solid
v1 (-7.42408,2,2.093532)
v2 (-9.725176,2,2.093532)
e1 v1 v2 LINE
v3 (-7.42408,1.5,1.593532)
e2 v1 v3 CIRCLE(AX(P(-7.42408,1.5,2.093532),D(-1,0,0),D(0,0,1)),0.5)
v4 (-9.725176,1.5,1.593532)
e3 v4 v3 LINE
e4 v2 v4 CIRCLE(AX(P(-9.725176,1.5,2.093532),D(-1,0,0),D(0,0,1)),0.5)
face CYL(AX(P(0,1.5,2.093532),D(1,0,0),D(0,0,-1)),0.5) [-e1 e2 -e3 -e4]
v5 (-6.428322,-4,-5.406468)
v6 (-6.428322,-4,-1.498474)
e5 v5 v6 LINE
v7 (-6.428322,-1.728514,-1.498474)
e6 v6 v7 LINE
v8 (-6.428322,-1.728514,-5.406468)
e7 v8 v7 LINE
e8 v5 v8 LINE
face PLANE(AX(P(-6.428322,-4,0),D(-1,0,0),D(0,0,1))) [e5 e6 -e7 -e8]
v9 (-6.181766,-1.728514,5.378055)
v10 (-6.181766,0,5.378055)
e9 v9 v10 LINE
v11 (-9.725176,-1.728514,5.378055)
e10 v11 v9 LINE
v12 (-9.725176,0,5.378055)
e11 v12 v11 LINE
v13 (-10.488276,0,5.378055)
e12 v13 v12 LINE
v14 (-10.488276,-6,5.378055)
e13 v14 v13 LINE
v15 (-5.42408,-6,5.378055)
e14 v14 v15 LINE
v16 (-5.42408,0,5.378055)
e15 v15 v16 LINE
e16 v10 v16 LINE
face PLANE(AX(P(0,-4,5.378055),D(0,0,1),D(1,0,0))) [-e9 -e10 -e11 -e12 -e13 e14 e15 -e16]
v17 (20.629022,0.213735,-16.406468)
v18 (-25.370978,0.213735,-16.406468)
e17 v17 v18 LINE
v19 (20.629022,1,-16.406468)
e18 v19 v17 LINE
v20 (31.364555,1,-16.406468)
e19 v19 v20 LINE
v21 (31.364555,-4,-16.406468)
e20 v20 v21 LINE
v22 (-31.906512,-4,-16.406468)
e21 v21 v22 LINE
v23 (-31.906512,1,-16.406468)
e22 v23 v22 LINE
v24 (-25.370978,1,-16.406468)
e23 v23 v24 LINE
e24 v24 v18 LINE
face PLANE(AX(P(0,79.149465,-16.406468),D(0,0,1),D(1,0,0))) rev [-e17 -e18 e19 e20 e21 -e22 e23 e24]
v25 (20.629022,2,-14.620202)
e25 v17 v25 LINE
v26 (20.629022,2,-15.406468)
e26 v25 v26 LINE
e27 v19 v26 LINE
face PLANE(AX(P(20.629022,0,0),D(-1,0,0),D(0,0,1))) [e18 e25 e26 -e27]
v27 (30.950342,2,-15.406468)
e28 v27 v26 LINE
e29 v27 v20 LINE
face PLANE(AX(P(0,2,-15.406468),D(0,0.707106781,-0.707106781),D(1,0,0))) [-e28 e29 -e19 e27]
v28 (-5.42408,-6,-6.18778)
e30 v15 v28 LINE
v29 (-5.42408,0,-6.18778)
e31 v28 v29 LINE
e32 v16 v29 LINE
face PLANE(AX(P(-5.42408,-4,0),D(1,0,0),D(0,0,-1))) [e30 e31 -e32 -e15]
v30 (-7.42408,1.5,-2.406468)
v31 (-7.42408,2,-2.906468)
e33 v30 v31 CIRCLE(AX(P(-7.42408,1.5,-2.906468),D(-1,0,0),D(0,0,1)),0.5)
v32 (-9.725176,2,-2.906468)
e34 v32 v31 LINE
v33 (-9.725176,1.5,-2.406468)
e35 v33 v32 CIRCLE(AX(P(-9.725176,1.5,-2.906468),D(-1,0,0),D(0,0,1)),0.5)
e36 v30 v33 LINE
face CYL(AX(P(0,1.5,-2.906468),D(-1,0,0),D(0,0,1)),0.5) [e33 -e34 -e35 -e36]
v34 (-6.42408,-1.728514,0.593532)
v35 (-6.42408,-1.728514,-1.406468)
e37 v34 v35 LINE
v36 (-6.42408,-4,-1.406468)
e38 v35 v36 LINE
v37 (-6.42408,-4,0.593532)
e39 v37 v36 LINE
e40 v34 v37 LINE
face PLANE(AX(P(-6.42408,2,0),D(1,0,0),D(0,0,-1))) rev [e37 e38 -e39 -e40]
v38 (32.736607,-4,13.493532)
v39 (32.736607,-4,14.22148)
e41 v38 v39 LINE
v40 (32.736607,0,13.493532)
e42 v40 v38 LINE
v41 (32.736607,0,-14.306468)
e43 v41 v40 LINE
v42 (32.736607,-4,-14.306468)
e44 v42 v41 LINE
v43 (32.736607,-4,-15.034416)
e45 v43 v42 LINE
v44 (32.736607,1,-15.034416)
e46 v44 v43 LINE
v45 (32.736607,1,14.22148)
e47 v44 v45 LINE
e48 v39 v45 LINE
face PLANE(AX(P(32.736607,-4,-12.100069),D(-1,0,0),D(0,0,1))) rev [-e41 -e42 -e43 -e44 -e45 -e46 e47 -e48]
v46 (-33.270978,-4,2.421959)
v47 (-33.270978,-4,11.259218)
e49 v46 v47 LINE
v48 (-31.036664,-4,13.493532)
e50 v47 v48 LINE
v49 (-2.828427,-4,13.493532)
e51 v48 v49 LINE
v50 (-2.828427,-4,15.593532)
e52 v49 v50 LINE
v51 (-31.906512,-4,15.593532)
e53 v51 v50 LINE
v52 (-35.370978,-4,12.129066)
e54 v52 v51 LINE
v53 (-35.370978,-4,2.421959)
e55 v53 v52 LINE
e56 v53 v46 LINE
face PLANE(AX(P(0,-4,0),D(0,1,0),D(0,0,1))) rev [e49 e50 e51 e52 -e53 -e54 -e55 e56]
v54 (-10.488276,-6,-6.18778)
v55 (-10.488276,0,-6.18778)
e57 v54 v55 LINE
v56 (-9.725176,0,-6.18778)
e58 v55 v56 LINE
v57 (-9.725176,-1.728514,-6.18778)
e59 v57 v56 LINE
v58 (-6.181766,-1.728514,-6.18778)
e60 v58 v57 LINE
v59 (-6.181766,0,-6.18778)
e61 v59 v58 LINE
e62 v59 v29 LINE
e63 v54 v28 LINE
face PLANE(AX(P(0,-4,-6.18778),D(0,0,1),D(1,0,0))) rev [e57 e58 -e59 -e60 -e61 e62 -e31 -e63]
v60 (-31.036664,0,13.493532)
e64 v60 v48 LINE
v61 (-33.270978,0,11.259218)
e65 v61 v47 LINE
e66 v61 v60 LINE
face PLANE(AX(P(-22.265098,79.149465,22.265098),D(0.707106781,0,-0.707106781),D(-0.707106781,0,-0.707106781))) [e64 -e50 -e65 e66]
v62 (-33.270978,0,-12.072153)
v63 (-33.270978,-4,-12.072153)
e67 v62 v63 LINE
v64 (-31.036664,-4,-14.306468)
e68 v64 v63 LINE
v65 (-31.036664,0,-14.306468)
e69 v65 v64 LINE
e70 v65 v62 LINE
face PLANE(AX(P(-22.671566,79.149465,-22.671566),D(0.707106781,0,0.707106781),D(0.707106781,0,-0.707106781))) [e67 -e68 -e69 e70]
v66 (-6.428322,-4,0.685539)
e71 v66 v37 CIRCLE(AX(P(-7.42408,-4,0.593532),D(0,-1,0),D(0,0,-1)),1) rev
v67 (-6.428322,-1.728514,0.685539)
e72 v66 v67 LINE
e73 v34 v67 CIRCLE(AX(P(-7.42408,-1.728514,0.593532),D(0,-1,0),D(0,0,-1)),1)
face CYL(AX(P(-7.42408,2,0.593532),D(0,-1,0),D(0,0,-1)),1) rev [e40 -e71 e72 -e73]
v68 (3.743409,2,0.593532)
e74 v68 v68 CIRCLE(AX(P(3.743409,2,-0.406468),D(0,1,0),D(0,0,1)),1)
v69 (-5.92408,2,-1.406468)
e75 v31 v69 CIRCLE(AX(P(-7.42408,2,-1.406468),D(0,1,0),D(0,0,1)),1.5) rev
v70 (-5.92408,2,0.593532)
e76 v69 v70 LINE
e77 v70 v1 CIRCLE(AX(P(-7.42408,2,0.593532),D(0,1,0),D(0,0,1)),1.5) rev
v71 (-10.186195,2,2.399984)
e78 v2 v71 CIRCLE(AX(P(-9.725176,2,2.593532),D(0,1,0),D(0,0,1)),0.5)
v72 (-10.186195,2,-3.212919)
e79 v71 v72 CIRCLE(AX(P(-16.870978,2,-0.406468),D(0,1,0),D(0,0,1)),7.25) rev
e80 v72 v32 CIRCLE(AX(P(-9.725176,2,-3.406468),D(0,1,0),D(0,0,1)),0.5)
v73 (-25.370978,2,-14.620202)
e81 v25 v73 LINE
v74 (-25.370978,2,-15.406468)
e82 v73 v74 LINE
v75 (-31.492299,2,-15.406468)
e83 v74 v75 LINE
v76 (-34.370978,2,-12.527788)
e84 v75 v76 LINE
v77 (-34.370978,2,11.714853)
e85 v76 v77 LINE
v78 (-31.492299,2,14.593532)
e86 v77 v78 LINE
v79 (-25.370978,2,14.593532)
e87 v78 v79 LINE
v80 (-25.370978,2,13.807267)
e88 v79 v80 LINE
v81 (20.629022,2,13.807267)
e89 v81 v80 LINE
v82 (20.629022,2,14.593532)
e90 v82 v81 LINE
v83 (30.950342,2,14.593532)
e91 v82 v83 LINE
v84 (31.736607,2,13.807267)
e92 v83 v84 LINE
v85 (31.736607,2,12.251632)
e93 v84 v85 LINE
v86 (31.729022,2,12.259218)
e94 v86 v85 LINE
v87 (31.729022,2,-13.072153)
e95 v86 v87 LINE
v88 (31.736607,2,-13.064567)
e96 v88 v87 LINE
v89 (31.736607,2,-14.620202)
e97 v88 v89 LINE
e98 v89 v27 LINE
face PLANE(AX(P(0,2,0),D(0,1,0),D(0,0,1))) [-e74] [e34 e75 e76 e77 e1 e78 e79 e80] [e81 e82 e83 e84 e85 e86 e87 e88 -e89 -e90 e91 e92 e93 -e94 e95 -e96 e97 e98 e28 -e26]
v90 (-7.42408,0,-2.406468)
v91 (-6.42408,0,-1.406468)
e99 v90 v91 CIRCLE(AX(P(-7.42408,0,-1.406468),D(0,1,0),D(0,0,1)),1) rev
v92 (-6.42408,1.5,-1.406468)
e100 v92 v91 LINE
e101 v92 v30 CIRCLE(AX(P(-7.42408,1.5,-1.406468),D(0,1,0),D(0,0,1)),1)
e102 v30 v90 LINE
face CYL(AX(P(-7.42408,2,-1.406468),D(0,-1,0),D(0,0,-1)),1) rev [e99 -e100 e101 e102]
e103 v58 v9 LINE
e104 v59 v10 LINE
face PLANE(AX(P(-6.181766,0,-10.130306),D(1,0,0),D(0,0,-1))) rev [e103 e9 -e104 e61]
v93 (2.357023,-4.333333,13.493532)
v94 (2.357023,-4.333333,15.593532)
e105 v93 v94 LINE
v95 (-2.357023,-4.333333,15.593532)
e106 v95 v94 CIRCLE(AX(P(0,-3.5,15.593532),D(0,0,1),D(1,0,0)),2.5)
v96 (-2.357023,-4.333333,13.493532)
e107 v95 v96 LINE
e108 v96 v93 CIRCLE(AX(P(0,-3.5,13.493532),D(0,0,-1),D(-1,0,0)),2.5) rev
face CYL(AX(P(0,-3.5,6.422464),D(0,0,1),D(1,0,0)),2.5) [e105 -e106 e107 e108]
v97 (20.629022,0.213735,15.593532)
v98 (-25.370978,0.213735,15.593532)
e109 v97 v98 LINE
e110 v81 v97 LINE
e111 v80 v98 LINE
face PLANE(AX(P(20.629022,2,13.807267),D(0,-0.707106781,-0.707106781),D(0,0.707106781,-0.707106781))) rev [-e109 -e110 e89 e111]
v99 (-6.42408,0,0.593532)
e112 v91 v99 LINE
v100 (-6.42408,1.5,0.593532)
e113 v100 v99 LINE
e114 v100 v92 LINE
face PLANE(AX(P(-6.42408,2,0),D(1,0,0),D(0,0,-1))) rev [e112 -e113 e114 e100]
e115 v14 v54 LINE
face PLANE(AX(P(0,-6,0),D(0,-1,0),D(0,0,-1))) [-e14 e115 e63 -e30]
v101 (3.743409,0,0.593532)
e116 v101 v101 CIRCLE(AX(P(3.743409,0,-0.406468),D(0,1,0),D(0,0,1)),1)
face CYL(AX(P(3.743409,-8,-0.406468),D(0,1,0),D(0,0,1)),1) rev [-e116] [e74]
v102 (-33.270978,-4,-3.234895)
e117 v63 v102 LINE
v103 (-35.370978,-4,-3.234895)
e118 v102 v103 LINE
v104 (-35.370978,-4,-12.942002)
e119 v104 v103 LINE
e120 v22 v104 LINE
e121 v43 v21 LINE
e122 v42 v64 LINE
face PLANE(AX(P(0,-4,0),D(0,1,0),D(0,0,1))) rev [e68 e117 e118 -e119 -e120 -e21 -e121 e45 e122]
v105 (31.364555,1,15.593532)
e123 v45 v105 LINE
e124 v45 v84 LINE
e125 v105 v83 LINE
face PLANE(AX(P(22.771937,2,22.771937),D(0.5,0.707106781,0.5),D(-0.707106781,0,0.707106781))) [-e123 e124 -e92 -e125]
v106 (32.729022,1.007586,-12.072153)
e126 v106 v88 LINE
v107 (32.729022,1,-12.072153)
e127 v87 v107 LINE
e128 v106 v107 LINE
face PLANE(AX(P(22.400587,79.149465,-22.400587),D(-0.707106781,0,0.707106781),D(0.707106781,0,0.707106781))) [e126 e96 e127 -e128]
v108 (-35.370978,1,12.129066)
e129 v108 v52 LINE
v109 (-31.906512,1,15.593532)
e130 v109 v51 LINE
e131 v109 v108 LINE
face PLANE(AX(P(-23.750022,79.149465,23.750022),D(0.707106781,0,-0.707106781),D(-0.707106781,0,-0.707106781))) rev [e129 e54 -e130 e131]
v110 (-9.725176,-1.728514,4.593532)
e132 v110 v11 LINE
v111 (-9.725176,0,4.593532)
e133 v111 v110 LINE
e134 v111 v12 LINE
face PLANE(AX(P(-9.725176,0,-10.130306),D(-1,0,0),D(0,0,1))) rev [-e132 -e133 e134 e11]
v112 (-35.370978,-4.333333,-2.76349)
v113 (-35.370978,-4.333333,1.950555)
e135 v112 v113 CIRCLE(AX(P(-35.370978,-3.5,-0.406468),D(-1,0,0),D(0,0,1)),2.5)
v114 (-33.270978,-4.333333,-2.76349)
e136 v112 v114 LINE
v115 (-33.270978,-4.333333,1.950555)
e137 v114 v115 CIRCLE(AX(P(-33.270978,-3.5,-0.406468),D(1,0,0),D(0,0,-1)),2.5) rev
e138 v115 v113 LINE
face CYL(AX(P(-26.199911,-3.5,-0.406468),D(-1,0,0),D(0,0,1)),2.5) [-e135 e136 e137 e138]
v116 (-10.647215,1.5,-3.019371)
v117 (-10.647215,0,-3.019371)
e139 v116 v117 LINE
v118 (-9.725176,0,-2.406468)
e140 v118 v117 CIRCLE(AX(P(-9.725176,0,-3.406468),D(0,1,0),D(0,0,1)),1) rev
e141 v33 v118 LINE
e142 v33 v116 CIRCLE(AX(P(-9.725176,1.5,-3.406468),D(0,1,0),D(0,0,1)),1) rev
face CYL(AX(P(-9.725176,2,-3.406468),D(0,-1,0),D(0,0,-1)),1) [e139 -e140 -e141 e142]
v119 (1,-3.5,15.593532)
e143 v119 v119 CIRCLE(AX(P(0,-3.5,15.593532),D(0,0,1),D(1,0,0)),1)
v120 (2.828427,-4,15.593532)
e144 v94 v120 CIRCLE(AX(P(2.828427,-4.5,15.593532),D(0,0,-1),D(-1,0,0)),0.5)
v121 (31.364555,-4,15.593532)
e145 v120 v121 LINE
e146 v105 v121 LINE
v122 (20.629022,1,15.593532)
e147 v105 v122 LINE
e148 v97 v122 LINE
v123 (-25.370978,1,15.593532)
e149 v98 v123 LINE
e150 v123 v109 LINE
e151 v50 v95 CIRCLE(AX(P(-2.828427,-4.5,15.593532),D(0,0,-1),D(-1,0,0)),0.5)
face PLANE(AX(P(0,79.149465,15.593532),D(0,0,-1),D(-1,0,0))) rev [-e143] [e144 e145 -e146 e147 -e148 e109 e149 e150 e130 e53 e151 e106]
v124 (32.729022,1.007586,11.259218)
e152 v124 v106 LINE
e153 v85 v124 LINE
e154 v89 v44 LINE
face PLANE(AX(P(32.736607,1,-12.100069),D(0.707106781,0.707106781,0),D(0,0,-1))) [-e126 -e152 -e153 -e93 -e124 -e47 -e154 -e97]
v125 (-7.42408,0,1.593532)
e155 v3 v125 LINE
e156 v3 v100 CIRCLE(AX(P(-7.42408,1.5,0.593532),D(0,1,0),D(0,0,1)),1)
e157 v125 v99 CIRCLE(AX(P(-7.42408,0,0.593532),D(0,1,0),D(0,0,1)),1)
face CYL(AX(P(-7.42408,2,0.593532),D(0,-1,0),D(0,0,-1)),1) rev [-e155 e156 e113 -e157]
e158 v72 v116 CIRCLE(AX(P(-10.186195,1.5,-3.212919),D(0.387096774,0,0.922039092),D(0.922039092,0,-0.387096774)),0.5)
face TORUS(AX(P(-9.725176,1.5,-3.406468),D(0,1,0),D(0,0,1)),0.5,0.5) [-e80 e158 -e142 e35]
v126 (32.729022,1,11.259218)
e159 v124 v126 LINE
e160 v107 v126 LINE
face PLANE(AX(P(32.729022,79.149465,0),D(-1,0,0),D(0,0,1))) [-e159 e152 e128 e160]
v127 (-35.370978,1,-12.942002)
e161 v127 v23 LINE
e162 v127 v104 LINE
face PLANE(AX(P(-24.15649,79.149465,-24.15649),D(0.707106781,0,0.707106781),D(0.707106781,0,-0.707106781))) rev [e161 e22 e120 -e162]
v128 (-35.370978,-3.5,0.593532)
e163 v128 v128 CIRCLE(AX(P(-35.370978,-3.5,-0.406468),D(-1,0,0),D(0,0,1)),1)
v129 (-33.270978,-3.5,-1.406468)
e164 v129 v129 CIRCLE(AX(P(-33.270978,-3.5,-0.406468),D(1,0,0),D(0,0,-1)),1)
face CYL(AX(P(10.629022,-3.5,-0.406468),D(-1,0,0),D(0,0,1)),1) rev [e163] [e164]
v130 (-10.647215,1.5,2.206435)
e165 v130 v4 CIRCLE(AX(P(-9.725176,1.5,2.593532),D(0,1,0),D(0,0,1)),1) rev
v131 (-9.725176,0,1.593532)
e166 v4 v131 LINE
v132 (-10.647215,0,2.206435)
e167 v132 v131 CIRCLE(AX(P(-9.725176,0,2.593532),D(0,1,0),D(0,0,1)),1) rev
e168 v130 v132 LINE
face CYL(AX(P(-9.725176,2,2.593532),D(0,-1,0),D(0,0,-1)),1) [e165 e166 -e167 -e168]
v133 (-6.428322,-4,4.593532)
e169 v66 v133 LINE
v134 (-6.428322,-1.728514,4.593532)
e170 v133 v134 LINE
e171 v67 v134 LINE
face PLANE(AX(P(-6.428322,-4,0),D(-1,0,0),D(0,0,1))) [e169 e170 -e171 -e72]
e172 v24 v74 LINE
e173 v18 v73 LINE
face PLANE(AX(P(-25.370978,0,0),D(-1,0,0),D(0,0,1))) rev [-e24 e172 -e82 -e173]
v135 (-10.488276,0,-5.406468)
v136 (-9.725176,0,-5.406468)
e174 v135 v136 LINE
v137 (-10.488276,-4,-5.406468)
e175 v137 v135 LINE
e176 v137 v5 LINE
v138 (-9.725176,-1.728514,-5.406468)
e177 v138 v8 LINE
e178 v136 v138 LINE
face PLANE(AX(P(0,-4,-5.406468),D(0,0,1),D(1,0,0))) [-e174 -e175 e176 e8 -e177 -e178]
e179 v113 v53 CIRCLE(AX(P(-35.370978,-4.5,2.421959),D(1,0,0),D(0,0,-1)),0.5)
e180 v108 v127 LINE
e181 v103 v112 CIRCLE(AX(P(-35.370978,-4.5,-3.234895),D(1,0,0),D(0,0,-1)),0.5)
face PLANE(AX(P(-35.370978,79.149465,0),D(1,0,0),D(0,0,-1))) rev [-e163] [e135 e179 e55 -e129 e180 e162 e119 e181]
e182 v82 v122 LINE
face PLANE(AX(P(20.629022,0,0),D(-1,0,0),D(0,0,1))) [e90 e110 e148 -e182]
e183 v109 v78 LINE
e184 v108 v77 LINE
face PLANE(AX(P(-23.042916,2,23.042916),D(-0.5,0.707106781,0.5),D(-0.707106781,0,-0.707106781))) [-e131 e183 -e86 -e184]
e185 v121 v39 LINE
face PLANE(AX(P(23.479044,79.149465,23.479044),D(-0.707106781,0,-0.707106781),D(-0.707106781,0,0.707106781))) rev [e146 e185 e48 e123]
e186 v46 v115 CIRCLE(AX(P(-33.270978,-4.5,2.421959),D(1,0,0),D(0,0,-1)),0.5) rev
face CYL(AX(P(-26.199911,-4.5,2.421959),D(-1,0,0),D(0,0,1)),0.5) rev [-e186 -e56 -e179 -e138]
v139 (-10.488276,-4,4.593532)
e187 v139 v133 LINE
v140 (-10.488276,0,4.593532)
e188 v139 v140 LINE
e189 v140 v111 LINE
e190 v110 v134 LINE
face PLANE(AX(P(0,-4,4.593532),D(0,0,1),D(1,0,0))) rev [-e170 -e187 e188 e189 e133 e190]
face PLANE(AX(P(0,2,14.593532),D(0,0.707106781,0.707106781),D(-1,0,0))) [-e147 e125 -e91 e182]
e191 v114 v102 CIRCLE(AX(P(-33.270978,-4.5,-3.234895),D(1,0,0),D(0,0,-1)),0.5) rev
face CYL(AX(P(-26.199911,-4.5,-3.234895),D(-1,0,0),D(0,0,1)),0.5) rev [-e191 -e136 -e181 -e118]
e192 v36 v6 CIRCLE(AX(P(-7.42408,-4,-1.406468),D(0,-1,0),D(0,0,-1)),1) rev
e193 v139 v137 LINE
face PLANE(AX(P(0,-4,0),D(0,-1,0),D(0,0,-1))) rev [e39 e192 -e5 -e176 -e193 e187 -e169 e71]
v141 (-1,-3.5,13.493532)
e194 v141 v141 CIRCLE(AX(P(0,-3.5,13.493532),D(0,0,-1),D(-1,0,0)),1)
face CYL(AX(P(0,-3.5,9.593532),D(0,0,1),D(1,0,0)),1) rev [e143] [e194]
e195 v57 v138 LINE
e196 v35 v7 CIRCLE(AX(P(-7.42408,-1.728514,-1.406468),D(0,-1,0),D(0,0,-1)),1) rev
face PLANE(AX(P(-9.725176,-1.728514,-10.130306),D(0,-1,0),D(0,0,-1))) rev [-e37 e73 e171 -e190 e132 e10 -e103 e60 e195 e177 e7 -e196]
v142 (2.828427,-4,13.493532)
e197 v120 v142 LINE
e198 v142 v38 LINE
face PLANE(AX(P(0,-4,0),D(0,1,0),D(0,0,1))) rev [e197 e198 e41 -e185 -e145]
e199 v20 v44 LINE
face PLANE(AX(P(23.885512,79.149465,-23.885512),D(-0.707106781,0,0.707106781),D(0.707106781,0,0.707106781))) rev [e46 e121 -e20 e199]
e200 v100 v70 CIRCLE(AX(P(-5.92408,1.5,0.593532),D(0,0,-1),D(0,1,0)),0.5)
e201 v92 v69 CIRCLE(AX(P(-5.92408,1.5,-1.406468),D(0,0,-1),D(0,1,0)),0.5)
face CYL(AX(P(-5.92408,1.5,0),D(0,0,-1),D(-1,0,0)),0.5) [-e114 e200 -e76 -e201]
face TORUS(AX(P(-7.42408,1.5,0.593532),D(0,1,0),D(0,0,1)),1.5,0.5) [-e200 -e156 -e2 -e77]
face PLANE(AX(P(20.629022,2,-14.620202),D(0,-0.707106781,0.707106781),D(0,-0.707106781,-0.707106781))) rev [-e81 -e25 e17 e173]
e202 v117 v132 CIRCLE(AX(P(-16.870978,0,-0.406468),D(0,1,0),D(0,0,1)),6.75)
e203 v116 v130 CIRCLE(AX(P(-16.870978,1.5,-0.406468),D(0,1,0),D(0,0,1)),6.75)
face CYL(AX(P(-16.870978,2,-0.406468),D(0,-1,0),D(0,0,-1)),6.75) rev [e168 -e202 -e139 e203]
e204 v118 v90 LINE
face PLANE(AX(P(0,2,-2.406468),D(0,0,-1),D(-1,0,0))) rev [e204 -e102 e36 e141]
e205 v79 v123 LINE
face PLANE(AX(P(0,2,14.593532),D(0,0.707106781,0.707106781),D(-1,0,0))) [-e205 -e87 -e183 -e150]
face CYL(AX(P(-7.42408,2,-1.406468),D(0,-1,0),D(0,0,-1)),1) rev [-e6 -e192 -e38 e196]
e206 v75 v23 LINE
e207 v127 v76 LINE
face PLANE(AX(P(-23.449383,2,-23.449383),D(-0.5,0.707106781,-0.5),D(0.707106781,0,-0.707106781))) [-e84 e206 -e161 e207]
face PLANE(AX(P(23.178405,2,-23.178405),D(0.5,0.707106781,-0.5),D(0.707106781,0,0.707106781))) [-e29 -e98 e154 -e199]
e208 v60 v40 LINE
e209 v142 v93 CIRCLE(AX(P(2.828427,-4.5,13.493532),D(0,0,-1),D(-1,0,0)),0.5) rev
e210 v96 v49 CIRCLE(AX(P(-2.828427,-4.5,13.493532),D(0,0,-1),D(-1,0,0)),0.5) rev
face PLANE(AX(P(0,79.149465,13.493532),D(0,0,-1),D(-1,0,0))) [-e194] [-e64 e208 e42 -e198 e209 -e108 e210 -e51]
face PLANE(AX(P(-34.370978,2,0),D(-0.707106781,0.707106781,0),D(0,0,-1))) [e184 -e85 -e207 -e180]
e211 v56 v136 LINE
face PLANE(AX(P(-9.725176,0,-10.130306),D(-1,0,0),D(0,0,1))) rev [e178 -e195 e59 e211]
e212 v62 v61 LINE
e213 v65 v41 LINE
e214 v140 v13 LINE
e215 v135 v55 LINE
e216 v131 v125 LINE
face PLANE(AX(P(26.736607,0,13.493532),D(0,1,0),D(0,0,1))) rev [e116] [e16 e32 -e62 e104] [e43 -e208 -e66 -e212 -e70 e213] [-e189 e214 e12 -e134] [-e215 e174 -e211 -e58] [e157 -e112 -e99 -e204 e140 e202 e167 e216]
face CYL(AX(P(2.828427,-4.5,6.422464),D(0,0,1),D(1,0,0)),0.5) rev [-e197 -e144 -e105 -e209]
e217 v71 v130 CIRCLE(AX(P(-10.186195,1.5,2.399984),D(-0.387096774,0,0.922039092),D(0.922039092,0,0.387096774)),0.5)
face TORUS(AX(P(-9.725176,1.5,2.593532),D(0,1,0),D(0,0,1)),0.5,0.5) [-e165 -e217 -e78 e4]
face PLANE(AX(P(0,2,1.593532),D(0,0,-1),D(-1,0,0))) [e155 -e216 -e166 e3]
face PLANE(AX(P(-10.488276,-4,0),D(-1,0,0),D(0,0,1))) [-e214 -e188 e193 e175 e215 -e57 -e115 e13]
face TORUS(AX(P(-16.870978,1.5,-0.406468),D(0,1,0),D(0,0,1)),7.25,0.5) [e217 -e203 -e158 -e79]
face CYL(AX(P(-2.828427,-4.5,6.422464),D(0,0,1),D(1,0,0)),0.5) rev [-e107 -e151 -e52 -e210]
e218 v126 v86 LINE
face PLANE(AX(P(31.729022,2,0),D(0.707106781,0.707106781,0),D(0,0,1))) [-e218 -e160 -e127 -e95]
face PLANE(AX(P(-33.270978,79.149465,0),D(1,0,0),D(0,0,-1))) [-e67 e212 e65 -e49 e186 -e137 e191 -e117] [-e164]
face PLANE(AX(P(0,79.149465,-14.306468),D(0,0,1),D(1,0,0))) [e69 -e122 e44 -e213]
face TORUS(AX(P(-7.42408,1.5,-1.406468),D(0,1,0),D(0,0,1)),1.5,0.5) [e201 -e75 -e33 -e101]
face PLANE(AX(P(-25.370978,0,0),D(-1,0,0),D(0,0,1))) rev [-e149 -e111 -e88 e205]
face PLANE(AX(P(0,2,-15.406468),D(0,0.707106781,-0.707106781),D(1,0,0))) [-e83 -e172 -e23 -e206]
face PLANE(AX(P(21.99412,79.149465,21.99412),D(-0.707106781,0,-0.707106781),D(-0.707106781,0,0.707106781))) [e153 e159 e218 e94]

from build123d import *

# Parameters (mm, degrees)
BOSS_EXTRUDE1_DEPTH      = 2
BOSS_EXTRUDE2_DEPTH      = 2
BOSS_EXTRUDE2_DEPTH_BACK = 4
CHAMFER2_SIZE            = 1
CUT_EXTRUDE3_DEPTH       = 6
CHAMFER3_SIZE            = 1
CHAMFER4_SIZE            = 1
SKETCH5_W                = 27.8
SKETCH5_H                = 4
CUT_EXTRUDE4_DEPTH       = 6
FILLET1_R                = 0.5
CUT_EXTRUDE5_START       = -10
CUT_EXTRUDE5_DEPTH       = 46
SKETCH7_R                = 2.5
BOSS_EXTRUDE3_DEPTH      = 2.1
FILLET2_R                = 0.5
SKETCH8_R                = 2.5
BOSS_EXTRUDE4_DEPTH      = 2.1
FILLET3_R                = 0.5
SKETCH9_R                = 1
CUT_EXTRUDE6_DEPTH       = 46
SKETCH10_R               = 1
CUT_EXTRUDE7_DEPTH       = 6
SKETCH11_R               = 1
CUT_EXTRUDE8_DEPTH       = 10
BOSS_EXTRUDE5_START      = 4
SKETCH12_W               = 5.064195868
SKETCH12_H               = 0.781312031
SKETCH12_H_2             = 0.784523075
BOSS_EXTRUDE5_DEPTH      = 4
BOSS_EXTRUDE6_START      = 4
SKETCH12_4_W             = 5.064195868
SKETCH12_4_H             = 0.781312031
SKETCH12_4_H_2           = 0.784523075
BOSS_EXTRUDE6_DEPTH      = 2
CUT_EXTRUDE9_REACH       = 43.972
SKETCH14_W               = 3.543409349
SKETCH14_H               = 1.728514359


with BuildPart() as part:
    # Sketch1 → Boss-Extrude1 (new body)
    # profile 1 of 2: a face of its own
    with BuildSketch(Plane(origin=(0, 0, 0), x_dir=(1, 0, 0), z_dir=(0, 1, 0))):
        Polygon((32.729021504, 4.406467745), (32.729021504, 12.07215317), (30.494706929, 14.306467745), (-31.036663921, 14.306467745), (-33.270978496, 12.07215317), (-33.270978496, -11.25921768), (-31.036663921, -13.493532255), (30.494706929, -13.493532255), (32.729021504, -11.25921768), (32.729021504, -3.593532255), align=None)
        Polygon((32.329021504, 4.406467745), (32.329021504, 11.906467745), (30.329021504, 13.906467745), (-30.870978496, 13.906467745), (-32.870978496, 11.906467745), (-32.870978496, -11.093532255), (-30.870978496, -13.093532255), (30.329021504, -13.093532255), (32.329021504, -11.093532255), (32.329021504, -3.593532255), align=None, mode=Mode.SUBTRACT)
    # profile 2 of 2: a face of its own
    with BuildSketch(Plane(origin=(0, 0, 0), x_dir=(1, 0, 0), z_dir=(0, 1, 0))):
        Polygon((32.329021504, 4.406467745), (32.329021504, -3.593532255), (32.329021504, -11.093532255), (30.329021504, -13.093532255), (-30.870978496, -13.093532255), (-32.870978496, -11.093532255), (-32.870978496, 11.906467745), (-30.870978496, 13.906467745), (30.329021504, 13.906467745), (32.329021504, 11.906467745), align=None)
        with BuildLine():
            ThreePointArc((-9.725175532, 2.406467745), (-10.278756252, 2.573672219), (-10.647214625, 3.01937097))
            ThreePointArc((-10.647214625, 3.01937097), (-23.620978496, 0.406467745), (-10.647214625, -2.206435481))
            ThreePointArc((-10.647214625, -2.206435481), (-10.278756252, -1.76073673), (-9.725175532, -1.593532255))
            Line((-9.725175532, -1.593532255), (-7.424080017, -1.593532255))
            ThreePointArc((-7.424080017, -1.593532255), (-6.716973236, -1.300639037), (-6.424080017, -0.593532255))
            Line((-6.424080017, -0.593532255), (-6.424080017, 1.406467745))
            ThreePointArc((-6.424080017, 1.406467745), (-6.716973236, 2.113574526), (-7.424080017, 2.406467745))
            Line((-7.424080017, 2.406467745), (-9.725175532, 2.406467745))
        make_face(mode=Mode.SUBTRACT)
    extrude(amount=BOSS_EXTRUDE1_DEPTH)

    # Chamfer4
    chamfer4_edges = [part.edges().sort_by_distance(p)[0] for p in [
        (32.729021504, 2, -0.406467745),
    ]]
    chamfer(chamfer4_edges, length=CHAMFER4_SIZE)

    # Fillet1
    fillet1_edges = [part.edges().sort_by_distance(p)[0] for p in [
        (-8.574627775, 2, -2.406467745),
        (-6.716973236, 2, -2.113574526),
        (-6.424080017, 2, -0.406467745),
        (-6.716973236, 2, 1.300639037),
        (-8.574627775, 2, 1.593532255),
        (-10.278756252, 2, 1.76073673),
        (-23.620978496, 2, -0.406467745),
        (-10.278756252, 2, -2.573672219),
    ]]
    fillet(fillet1_edges, radius=FILLET1_R)

    # Sketch11 → Cut-Extrude8 (cut)
    with BuildSketch(Plane(origin=(0, 2, 0), x_dir=(1, 0, 0), z_dir=(0, 1, 0))):
        with Locations(Location((3.743408684, 0.406467745, 0), (0, 0, 270))):
            Circle(SKETCH11_R)
    extrude(amount=-CUT_EXTRUDE8_DEPTH, mode=Mode.SUBTRACT)


with BuildPart() as body_2:
    # Sketch1<3> → Boss-Extrude2 (new, two sides: drawn at the far end of the back side and taken through both)
    with BuildSketch(Plane(origin=(0, 0, 0), x_dir=(1, 0, 0), z_dir=(0, 1, 0)).offset(-BOSS_EXTRUDE2_DEPTH_BACK)):
        Polygon((34.829021504, 12.942001651), (31.36455541, 16.406467745), (-31.906512402, 16.406467745), (-35.370978496, 12.942001651), (-35.370978496, -12.129066161), (-31.906512402, -15.593532255), (31.36455541, -15.593532255), (34.829021504, -12.129066161), (34.829021504, -3.593532255), (34.829021504, 4.406467745), align=None)
        Polygon((32.729021504, 12.07215317), (30.494706929, 14.306467745), (-31.036663921, 14.306467745), (-33.270978496, 12.07215317), (-33.270978496, -11.25921768), (-31.036663921, -13.493532255), (30.494706929, -13.493532255), (32.729021504, -11.25921768), (32.729021504, -3.593532255), (32.729021504, 4.406467745), align=None, mode=Mode.SUBTRACT)
    extrude(amount=BOSS_EXTRUDE2_DEPTH + BOSS_EXTRUDE2_DEPTH_BACK)

    # Chamfer2
    chamfer2_edges = [body_2.edges().sort_by_distance(p)[0] for p in [
        (-0.270978496, 2, -16.406467745),
        (-33.638745449, 2, -14.674234698),
        (-35.370978496, 2, -0.406467745),
        (-33.638745449, 2, 13.861299208),
        (-0.270978496, 2, 15.593532255),
        (33.096788457, 2, 13.861299208),
        (34.829021504, 2, -0.406467745),
        (33.096788457, 2, -14.674234698),
    ]]
    chamfer(chamfer2_edges, length=CHAMFER2_SIZE)

    # Sketch4 → Cut-Extrude3 (cut)
    with BuildSketch(Plane(origin=(0, 2, 0), x_dir=(1, 0, 0), z_dir=(0, 1, 0))):
        Polygon((32.736607325, 12.100069105), (32.736607325, 15.066969795), (34.829021504, 12.974555617), (34.829021504, -12.129066161), (32.736607325, -14.22148034), (32.736607325, -11.231301745), align=None)
    extrude(amount=-CUT_EXTRUDE3_DEPTH, mode=Mode.SUBTRACT)

    # Chamfer3
    # the kernel refuses this chamfer: 1 mm, written as the material it takes off along each edge
    with BuildSketch(Plane(origin=(32.736607325, 2, 15.378949765), x_dir=(0.02749587661058907, -0.9996219169112965, 0), z_dir=(0, 0, -1))) as chamfer3_piece_1:
        Polygon((CHAMFER3_SIZE * 0.999621916911, CHAMFER3_SIZE * 0.0274958766106), (-CHAMFER3_SIZE * 0.0274958766106, CHAMFER3_SIZE * 0.999621916911), (0, 0), align=None)
    extrude(amount=31.57083502, mode=Mode.SUBTRACT)

    # Sketch5 → Cut-Extrude4 (cut)
    with BuildSketch(Plane(origin=(32.736607325, 0, 0), x_dir=(0, 0, -1), z_dir=(1, 0, 0))):
        with Locations((0.406467745, -2)):
            Rectangle(SKETCH5_W, SKETCH5_H)
    extrude(amount=-CUT_EXTRUDE4_DEPTH, mode=Mode.SUBTRACT)

    # Sketch6 → Cut-Extrude5 (cut)
    with BuildSketch(Plane.ZY.offset(35.370978496).offset(CUT_EXTRUDE5_START)):
        Polygon((-14.620202266, 2), (-16.406467745, 0.213734522), (-16.406467745, 2), align=None)
        Polygon((15.593532255, 2), (13.807266777, 2), (15.593532255, 0.213734522), align=None)
    extrude(amount=-CUT_EXTRUDE5_DEPTH, mode=Mode.SUBTRACT)

    # Sketch7 → Boss-Extrude3 (add)
    with BuildSketch(Plane.XY.offset(15.593532255)):
        with Locations((0, -3.5)):
            Circle(SKETCH7_R)
    extrude(amount=-BOSS_EXTRUDE3_DEPTH)

    # Fillet2
    fillet2_edges = [body_2.edges().sort_by_distance(p)[0] for p in [
        (2.449489743, -4, 14.543532255),
        (-2.449489743, -4, 14.543532255),
    ]]
    fillet(fillet2_edges, radius=FILLET2_R)

    # Sketch8 → Boss-Extrude4 (add)
    with BuildSketch(Plane.ZY.offset(35.370978496)):
        with Locations((-0.406467745, -3.5)):
            Circle(SKETCH8_R)
    extrude(amount=-BOSS_EXTRUDE4_DEPTH)

    # Fillet3
    fillet3_edges = [body_2.edges().sort_by_distance(p)[0] for p in [
        (-34.320978496, -4, -2.855957487),
        (-34.320978496, -4, 2.043021998),
    ]]
    fillet(fillet3_edges, radius=FILLET3_R)

    # Sketch9 → Cut-Extrude6 (cut)
    with BuildSketch(Plane.ZY.offset(35.370978496)):
        with Locations((-0.406467745, -3.5)):
            Circle(SKETCH9_R)
    extrude(amount=-CUT_EXTRUDE6_DEPTH, mode=Mode.SUBTRACT)

    # Sketch10 → Cut-Extrude7 (cut)
    with BuildSketch(Plane.XY.offset(15.593532255)):
        with Locations((0, -3.5)):
            Circle(SKETCH10_R)
    extrude(amount=-CUT_EXTRUDE7_DEPTH, mode=Mode.SUBTRACT)


    add(part.part)  # Boss-Extrude5 merges part
    # Sketch12 → Boss-Extrude5 (add)
    with BuildSketch(Plane(origin=(0, 0, 0), x_dir=(-1, 0, 0), z_dir=(0, -1, 0)).offset(BOSS_EXTRUDE5_START)):
        with Locations((7.956177951, 5.79712376)):
            Rectangle(SKETCH12_W, SKETCH12_H)
        with BuildLine():
            Line((5.424080017, -4.593532255), (6.428321603, -4.593532255))
            Line((6.428321603, -4.593532255), (6.428321603, -0.685538667))
            ThreePointArc((6.428321603, -0.685538667), (6.425140976, -0.639584321), (6.424080017, -0.593532255))
            Line((6.424080017, -0.593532255), (6.424080017, 1.406467745))
            ThreePointArc((6.424080017, 1.406467745), (6.425140976, 1.45251981), (6.428321603, 1.498474156))
            Line((6.428321603, 1.498474156), (6.428321603, 5.406467745))
            Line((6.428321603, 5.406467745), (5.424080017, 5.406467745))
            Line((5.424080017, 5.406467745), (5.424080017, -4.593532255))
        make_face()
        with Locations((7.956177951, -4.985793793)):
            Rectangle(SKETCH12_W, SKETCH12_H_2)
    extrude(amount=-BOSS_EXTRUDE5_DEPTH)

    # Sketch12<4> → Boss-Extrude6 (add)
    with BuildSketch(Plane(origin=(0, 0, 0), x_dir=(-1, 0, 0), z_dir=(0, -1, 0)).offset(BOSS_EXTRUDE6_START)):
        with BuildLine():
            ThreePointArc((9.725175532, 2.406467745), (10.145722789, 2.499197109), (10.488275885, 2.760187734))
            Line((10.488275885, 2.760187734), (10.488275885, 5.406467745))
            Line((10.488275885, 5.406467745), (6.428321603, 5.406467745))
            Line((6.428321603, 5.406467745), (6.428321603, 1.498474156))
            ThreePointArc((6.428321603, 1.498474156), (6.750287175, 2.145388042), (7.424080017, 2.406467745))
            Line((7.424080017, 2.406467745), (9.725175532, 2.406467745))
        make_face()
        with BuildLine():
            Line((6.428321603, -4.593532255), (10.488275885, -4.593532255))
            Line((10.488275885, -4.593532255), (10.488275885, -1.947252245))
            ThreePointArc((10.488275885, -1.947252245), (10.145722789, -1.68626162), (9.725175532, -1.593532255))
            Line((9.725175532, -1.593532255), (7.424080017, -1.593532255))
            ThreePointArc((7.424080017, -1.593532255), (6.750287175, -1.332452553), (6.428321603, -0.685538667))
            Line((6.428321603, -0.685538667), (6.428321603, -4.593532255))
        make_face()
        with BuildLine():
            Line((5.424080017, -4.593532255), (6.428321603, -4.593532255))
            Line((6.428321603, -4.593532255), (6.428321603, -0.685538667))
            ThreePointArc((6.428321603, -0.685538667), (6.425140976, -0.639584321), (6.424080017, -0.593532255))
            Line((6.424080017, -0.593532255), (6.424080017, 1.406467745))
            ThreePointArc((6.424080017, 1.406467745), (6.425140976, 1.45251981), (6.428321603, 1.498474156))
            Line((6.428321603, 1.498474156), (6.428321603, 5.406467745))
            Line((6.428321603, 5.406467745), (5.424080017, 5.406467745))
            Line((5.424080017, 5.406467745), (5.424080017, -4.593532255))
        make_face()
        with Locations((7.956177951, 5.79712376)):
            Rectangle(SKETCH12_4_W, SKETCH12_4_H)
        with BuildLine():
            ThreePointArc((9.725175532, -1.593532255), (10.145722789, -1.68626162), (10.488275885, -1.947252245))
            Line((10.488275885, -1.947252245), (10.488275885, 2.760187734))
            ThreePointArc((10.488275885, 2.760187734), (10.145722789, 2.499197109), (9.725175532, 2.406467745))
            Line((9.725175532, 2.406467745), (7.424080017, 2.406467745))
            ThreePointArc((7.424080017, 2.406467745), (6.750287175, 2.145388042), (6.428321603, 1.498474156))
            Line((6.428321603, 1.498474156), (6.428321603, -0.685538667))
            ThreePointArc((6.428321603, -0.685538667), (6.750287175, -1.332452553), (7.424080017, -1.593532255))
            Line((7.424080017, -1.593532255), (9.725175532, -1.593532255))
        make_face()
        with Locations((7.956177951, -4.985793793)):
            Rectangle(SKETCH12_4_W, SKETCH12_4_H_2)
        with BuildLine():
            ThreePointArc((6.424080017, -0.593532255), (6.425140976, -0.639584321), (6.428321603, -0.685538667))
            Line((6.428321603, -0.685538667), (6.428321603, 1.498474156))
            ThreePointArc((6.428321603, 1.498474156), (6.425140976, 1.45251981), (6.424080017, 1.406467745))
            Line((6.424080017, 1.406467745), (6.424080017, -0.593532255))
        make_face()
    extrude(amount=BOSS_EXTRUDE6_DEPTH)

    # Cut-Extrude9: up to this face of the body (flat: up to its plane)
    cut_extrude9_end = Plane(body_2.part.faces().sort_by_distance((-7.956177951, -3, -6.187779776))[0])
    # Sketch14 → Cut-Extrude9 (cut, up to the picked face)
    with BuildSketch(Plane.XY.offset(5.37805533), mode=Mode.PRIVATE) as cut_extrude9_sk1:
        with Locations((-7.953470858, -0.86425718)):
            Rectangle(SKETCH14_W, SKETCH14_H)
    cut_extrude9_tool1 = split(extrude(cut_extrude9_sk1.sketch, amount=-CUT_EXTRUDE9_REACH, mode=Mode.PRIVATE), bisect_by=cut_extrude9_end, keep=Keep.BOTH, mode=Mode.PRIVATE)
    add(cut_extrude9_tool1.solids().sort_by(Axis((-7.953471, -0.864257, 5.378055), (0, 0, -1)))[0], mode=Mode.SUBTRACT)


solid = body_2.part
